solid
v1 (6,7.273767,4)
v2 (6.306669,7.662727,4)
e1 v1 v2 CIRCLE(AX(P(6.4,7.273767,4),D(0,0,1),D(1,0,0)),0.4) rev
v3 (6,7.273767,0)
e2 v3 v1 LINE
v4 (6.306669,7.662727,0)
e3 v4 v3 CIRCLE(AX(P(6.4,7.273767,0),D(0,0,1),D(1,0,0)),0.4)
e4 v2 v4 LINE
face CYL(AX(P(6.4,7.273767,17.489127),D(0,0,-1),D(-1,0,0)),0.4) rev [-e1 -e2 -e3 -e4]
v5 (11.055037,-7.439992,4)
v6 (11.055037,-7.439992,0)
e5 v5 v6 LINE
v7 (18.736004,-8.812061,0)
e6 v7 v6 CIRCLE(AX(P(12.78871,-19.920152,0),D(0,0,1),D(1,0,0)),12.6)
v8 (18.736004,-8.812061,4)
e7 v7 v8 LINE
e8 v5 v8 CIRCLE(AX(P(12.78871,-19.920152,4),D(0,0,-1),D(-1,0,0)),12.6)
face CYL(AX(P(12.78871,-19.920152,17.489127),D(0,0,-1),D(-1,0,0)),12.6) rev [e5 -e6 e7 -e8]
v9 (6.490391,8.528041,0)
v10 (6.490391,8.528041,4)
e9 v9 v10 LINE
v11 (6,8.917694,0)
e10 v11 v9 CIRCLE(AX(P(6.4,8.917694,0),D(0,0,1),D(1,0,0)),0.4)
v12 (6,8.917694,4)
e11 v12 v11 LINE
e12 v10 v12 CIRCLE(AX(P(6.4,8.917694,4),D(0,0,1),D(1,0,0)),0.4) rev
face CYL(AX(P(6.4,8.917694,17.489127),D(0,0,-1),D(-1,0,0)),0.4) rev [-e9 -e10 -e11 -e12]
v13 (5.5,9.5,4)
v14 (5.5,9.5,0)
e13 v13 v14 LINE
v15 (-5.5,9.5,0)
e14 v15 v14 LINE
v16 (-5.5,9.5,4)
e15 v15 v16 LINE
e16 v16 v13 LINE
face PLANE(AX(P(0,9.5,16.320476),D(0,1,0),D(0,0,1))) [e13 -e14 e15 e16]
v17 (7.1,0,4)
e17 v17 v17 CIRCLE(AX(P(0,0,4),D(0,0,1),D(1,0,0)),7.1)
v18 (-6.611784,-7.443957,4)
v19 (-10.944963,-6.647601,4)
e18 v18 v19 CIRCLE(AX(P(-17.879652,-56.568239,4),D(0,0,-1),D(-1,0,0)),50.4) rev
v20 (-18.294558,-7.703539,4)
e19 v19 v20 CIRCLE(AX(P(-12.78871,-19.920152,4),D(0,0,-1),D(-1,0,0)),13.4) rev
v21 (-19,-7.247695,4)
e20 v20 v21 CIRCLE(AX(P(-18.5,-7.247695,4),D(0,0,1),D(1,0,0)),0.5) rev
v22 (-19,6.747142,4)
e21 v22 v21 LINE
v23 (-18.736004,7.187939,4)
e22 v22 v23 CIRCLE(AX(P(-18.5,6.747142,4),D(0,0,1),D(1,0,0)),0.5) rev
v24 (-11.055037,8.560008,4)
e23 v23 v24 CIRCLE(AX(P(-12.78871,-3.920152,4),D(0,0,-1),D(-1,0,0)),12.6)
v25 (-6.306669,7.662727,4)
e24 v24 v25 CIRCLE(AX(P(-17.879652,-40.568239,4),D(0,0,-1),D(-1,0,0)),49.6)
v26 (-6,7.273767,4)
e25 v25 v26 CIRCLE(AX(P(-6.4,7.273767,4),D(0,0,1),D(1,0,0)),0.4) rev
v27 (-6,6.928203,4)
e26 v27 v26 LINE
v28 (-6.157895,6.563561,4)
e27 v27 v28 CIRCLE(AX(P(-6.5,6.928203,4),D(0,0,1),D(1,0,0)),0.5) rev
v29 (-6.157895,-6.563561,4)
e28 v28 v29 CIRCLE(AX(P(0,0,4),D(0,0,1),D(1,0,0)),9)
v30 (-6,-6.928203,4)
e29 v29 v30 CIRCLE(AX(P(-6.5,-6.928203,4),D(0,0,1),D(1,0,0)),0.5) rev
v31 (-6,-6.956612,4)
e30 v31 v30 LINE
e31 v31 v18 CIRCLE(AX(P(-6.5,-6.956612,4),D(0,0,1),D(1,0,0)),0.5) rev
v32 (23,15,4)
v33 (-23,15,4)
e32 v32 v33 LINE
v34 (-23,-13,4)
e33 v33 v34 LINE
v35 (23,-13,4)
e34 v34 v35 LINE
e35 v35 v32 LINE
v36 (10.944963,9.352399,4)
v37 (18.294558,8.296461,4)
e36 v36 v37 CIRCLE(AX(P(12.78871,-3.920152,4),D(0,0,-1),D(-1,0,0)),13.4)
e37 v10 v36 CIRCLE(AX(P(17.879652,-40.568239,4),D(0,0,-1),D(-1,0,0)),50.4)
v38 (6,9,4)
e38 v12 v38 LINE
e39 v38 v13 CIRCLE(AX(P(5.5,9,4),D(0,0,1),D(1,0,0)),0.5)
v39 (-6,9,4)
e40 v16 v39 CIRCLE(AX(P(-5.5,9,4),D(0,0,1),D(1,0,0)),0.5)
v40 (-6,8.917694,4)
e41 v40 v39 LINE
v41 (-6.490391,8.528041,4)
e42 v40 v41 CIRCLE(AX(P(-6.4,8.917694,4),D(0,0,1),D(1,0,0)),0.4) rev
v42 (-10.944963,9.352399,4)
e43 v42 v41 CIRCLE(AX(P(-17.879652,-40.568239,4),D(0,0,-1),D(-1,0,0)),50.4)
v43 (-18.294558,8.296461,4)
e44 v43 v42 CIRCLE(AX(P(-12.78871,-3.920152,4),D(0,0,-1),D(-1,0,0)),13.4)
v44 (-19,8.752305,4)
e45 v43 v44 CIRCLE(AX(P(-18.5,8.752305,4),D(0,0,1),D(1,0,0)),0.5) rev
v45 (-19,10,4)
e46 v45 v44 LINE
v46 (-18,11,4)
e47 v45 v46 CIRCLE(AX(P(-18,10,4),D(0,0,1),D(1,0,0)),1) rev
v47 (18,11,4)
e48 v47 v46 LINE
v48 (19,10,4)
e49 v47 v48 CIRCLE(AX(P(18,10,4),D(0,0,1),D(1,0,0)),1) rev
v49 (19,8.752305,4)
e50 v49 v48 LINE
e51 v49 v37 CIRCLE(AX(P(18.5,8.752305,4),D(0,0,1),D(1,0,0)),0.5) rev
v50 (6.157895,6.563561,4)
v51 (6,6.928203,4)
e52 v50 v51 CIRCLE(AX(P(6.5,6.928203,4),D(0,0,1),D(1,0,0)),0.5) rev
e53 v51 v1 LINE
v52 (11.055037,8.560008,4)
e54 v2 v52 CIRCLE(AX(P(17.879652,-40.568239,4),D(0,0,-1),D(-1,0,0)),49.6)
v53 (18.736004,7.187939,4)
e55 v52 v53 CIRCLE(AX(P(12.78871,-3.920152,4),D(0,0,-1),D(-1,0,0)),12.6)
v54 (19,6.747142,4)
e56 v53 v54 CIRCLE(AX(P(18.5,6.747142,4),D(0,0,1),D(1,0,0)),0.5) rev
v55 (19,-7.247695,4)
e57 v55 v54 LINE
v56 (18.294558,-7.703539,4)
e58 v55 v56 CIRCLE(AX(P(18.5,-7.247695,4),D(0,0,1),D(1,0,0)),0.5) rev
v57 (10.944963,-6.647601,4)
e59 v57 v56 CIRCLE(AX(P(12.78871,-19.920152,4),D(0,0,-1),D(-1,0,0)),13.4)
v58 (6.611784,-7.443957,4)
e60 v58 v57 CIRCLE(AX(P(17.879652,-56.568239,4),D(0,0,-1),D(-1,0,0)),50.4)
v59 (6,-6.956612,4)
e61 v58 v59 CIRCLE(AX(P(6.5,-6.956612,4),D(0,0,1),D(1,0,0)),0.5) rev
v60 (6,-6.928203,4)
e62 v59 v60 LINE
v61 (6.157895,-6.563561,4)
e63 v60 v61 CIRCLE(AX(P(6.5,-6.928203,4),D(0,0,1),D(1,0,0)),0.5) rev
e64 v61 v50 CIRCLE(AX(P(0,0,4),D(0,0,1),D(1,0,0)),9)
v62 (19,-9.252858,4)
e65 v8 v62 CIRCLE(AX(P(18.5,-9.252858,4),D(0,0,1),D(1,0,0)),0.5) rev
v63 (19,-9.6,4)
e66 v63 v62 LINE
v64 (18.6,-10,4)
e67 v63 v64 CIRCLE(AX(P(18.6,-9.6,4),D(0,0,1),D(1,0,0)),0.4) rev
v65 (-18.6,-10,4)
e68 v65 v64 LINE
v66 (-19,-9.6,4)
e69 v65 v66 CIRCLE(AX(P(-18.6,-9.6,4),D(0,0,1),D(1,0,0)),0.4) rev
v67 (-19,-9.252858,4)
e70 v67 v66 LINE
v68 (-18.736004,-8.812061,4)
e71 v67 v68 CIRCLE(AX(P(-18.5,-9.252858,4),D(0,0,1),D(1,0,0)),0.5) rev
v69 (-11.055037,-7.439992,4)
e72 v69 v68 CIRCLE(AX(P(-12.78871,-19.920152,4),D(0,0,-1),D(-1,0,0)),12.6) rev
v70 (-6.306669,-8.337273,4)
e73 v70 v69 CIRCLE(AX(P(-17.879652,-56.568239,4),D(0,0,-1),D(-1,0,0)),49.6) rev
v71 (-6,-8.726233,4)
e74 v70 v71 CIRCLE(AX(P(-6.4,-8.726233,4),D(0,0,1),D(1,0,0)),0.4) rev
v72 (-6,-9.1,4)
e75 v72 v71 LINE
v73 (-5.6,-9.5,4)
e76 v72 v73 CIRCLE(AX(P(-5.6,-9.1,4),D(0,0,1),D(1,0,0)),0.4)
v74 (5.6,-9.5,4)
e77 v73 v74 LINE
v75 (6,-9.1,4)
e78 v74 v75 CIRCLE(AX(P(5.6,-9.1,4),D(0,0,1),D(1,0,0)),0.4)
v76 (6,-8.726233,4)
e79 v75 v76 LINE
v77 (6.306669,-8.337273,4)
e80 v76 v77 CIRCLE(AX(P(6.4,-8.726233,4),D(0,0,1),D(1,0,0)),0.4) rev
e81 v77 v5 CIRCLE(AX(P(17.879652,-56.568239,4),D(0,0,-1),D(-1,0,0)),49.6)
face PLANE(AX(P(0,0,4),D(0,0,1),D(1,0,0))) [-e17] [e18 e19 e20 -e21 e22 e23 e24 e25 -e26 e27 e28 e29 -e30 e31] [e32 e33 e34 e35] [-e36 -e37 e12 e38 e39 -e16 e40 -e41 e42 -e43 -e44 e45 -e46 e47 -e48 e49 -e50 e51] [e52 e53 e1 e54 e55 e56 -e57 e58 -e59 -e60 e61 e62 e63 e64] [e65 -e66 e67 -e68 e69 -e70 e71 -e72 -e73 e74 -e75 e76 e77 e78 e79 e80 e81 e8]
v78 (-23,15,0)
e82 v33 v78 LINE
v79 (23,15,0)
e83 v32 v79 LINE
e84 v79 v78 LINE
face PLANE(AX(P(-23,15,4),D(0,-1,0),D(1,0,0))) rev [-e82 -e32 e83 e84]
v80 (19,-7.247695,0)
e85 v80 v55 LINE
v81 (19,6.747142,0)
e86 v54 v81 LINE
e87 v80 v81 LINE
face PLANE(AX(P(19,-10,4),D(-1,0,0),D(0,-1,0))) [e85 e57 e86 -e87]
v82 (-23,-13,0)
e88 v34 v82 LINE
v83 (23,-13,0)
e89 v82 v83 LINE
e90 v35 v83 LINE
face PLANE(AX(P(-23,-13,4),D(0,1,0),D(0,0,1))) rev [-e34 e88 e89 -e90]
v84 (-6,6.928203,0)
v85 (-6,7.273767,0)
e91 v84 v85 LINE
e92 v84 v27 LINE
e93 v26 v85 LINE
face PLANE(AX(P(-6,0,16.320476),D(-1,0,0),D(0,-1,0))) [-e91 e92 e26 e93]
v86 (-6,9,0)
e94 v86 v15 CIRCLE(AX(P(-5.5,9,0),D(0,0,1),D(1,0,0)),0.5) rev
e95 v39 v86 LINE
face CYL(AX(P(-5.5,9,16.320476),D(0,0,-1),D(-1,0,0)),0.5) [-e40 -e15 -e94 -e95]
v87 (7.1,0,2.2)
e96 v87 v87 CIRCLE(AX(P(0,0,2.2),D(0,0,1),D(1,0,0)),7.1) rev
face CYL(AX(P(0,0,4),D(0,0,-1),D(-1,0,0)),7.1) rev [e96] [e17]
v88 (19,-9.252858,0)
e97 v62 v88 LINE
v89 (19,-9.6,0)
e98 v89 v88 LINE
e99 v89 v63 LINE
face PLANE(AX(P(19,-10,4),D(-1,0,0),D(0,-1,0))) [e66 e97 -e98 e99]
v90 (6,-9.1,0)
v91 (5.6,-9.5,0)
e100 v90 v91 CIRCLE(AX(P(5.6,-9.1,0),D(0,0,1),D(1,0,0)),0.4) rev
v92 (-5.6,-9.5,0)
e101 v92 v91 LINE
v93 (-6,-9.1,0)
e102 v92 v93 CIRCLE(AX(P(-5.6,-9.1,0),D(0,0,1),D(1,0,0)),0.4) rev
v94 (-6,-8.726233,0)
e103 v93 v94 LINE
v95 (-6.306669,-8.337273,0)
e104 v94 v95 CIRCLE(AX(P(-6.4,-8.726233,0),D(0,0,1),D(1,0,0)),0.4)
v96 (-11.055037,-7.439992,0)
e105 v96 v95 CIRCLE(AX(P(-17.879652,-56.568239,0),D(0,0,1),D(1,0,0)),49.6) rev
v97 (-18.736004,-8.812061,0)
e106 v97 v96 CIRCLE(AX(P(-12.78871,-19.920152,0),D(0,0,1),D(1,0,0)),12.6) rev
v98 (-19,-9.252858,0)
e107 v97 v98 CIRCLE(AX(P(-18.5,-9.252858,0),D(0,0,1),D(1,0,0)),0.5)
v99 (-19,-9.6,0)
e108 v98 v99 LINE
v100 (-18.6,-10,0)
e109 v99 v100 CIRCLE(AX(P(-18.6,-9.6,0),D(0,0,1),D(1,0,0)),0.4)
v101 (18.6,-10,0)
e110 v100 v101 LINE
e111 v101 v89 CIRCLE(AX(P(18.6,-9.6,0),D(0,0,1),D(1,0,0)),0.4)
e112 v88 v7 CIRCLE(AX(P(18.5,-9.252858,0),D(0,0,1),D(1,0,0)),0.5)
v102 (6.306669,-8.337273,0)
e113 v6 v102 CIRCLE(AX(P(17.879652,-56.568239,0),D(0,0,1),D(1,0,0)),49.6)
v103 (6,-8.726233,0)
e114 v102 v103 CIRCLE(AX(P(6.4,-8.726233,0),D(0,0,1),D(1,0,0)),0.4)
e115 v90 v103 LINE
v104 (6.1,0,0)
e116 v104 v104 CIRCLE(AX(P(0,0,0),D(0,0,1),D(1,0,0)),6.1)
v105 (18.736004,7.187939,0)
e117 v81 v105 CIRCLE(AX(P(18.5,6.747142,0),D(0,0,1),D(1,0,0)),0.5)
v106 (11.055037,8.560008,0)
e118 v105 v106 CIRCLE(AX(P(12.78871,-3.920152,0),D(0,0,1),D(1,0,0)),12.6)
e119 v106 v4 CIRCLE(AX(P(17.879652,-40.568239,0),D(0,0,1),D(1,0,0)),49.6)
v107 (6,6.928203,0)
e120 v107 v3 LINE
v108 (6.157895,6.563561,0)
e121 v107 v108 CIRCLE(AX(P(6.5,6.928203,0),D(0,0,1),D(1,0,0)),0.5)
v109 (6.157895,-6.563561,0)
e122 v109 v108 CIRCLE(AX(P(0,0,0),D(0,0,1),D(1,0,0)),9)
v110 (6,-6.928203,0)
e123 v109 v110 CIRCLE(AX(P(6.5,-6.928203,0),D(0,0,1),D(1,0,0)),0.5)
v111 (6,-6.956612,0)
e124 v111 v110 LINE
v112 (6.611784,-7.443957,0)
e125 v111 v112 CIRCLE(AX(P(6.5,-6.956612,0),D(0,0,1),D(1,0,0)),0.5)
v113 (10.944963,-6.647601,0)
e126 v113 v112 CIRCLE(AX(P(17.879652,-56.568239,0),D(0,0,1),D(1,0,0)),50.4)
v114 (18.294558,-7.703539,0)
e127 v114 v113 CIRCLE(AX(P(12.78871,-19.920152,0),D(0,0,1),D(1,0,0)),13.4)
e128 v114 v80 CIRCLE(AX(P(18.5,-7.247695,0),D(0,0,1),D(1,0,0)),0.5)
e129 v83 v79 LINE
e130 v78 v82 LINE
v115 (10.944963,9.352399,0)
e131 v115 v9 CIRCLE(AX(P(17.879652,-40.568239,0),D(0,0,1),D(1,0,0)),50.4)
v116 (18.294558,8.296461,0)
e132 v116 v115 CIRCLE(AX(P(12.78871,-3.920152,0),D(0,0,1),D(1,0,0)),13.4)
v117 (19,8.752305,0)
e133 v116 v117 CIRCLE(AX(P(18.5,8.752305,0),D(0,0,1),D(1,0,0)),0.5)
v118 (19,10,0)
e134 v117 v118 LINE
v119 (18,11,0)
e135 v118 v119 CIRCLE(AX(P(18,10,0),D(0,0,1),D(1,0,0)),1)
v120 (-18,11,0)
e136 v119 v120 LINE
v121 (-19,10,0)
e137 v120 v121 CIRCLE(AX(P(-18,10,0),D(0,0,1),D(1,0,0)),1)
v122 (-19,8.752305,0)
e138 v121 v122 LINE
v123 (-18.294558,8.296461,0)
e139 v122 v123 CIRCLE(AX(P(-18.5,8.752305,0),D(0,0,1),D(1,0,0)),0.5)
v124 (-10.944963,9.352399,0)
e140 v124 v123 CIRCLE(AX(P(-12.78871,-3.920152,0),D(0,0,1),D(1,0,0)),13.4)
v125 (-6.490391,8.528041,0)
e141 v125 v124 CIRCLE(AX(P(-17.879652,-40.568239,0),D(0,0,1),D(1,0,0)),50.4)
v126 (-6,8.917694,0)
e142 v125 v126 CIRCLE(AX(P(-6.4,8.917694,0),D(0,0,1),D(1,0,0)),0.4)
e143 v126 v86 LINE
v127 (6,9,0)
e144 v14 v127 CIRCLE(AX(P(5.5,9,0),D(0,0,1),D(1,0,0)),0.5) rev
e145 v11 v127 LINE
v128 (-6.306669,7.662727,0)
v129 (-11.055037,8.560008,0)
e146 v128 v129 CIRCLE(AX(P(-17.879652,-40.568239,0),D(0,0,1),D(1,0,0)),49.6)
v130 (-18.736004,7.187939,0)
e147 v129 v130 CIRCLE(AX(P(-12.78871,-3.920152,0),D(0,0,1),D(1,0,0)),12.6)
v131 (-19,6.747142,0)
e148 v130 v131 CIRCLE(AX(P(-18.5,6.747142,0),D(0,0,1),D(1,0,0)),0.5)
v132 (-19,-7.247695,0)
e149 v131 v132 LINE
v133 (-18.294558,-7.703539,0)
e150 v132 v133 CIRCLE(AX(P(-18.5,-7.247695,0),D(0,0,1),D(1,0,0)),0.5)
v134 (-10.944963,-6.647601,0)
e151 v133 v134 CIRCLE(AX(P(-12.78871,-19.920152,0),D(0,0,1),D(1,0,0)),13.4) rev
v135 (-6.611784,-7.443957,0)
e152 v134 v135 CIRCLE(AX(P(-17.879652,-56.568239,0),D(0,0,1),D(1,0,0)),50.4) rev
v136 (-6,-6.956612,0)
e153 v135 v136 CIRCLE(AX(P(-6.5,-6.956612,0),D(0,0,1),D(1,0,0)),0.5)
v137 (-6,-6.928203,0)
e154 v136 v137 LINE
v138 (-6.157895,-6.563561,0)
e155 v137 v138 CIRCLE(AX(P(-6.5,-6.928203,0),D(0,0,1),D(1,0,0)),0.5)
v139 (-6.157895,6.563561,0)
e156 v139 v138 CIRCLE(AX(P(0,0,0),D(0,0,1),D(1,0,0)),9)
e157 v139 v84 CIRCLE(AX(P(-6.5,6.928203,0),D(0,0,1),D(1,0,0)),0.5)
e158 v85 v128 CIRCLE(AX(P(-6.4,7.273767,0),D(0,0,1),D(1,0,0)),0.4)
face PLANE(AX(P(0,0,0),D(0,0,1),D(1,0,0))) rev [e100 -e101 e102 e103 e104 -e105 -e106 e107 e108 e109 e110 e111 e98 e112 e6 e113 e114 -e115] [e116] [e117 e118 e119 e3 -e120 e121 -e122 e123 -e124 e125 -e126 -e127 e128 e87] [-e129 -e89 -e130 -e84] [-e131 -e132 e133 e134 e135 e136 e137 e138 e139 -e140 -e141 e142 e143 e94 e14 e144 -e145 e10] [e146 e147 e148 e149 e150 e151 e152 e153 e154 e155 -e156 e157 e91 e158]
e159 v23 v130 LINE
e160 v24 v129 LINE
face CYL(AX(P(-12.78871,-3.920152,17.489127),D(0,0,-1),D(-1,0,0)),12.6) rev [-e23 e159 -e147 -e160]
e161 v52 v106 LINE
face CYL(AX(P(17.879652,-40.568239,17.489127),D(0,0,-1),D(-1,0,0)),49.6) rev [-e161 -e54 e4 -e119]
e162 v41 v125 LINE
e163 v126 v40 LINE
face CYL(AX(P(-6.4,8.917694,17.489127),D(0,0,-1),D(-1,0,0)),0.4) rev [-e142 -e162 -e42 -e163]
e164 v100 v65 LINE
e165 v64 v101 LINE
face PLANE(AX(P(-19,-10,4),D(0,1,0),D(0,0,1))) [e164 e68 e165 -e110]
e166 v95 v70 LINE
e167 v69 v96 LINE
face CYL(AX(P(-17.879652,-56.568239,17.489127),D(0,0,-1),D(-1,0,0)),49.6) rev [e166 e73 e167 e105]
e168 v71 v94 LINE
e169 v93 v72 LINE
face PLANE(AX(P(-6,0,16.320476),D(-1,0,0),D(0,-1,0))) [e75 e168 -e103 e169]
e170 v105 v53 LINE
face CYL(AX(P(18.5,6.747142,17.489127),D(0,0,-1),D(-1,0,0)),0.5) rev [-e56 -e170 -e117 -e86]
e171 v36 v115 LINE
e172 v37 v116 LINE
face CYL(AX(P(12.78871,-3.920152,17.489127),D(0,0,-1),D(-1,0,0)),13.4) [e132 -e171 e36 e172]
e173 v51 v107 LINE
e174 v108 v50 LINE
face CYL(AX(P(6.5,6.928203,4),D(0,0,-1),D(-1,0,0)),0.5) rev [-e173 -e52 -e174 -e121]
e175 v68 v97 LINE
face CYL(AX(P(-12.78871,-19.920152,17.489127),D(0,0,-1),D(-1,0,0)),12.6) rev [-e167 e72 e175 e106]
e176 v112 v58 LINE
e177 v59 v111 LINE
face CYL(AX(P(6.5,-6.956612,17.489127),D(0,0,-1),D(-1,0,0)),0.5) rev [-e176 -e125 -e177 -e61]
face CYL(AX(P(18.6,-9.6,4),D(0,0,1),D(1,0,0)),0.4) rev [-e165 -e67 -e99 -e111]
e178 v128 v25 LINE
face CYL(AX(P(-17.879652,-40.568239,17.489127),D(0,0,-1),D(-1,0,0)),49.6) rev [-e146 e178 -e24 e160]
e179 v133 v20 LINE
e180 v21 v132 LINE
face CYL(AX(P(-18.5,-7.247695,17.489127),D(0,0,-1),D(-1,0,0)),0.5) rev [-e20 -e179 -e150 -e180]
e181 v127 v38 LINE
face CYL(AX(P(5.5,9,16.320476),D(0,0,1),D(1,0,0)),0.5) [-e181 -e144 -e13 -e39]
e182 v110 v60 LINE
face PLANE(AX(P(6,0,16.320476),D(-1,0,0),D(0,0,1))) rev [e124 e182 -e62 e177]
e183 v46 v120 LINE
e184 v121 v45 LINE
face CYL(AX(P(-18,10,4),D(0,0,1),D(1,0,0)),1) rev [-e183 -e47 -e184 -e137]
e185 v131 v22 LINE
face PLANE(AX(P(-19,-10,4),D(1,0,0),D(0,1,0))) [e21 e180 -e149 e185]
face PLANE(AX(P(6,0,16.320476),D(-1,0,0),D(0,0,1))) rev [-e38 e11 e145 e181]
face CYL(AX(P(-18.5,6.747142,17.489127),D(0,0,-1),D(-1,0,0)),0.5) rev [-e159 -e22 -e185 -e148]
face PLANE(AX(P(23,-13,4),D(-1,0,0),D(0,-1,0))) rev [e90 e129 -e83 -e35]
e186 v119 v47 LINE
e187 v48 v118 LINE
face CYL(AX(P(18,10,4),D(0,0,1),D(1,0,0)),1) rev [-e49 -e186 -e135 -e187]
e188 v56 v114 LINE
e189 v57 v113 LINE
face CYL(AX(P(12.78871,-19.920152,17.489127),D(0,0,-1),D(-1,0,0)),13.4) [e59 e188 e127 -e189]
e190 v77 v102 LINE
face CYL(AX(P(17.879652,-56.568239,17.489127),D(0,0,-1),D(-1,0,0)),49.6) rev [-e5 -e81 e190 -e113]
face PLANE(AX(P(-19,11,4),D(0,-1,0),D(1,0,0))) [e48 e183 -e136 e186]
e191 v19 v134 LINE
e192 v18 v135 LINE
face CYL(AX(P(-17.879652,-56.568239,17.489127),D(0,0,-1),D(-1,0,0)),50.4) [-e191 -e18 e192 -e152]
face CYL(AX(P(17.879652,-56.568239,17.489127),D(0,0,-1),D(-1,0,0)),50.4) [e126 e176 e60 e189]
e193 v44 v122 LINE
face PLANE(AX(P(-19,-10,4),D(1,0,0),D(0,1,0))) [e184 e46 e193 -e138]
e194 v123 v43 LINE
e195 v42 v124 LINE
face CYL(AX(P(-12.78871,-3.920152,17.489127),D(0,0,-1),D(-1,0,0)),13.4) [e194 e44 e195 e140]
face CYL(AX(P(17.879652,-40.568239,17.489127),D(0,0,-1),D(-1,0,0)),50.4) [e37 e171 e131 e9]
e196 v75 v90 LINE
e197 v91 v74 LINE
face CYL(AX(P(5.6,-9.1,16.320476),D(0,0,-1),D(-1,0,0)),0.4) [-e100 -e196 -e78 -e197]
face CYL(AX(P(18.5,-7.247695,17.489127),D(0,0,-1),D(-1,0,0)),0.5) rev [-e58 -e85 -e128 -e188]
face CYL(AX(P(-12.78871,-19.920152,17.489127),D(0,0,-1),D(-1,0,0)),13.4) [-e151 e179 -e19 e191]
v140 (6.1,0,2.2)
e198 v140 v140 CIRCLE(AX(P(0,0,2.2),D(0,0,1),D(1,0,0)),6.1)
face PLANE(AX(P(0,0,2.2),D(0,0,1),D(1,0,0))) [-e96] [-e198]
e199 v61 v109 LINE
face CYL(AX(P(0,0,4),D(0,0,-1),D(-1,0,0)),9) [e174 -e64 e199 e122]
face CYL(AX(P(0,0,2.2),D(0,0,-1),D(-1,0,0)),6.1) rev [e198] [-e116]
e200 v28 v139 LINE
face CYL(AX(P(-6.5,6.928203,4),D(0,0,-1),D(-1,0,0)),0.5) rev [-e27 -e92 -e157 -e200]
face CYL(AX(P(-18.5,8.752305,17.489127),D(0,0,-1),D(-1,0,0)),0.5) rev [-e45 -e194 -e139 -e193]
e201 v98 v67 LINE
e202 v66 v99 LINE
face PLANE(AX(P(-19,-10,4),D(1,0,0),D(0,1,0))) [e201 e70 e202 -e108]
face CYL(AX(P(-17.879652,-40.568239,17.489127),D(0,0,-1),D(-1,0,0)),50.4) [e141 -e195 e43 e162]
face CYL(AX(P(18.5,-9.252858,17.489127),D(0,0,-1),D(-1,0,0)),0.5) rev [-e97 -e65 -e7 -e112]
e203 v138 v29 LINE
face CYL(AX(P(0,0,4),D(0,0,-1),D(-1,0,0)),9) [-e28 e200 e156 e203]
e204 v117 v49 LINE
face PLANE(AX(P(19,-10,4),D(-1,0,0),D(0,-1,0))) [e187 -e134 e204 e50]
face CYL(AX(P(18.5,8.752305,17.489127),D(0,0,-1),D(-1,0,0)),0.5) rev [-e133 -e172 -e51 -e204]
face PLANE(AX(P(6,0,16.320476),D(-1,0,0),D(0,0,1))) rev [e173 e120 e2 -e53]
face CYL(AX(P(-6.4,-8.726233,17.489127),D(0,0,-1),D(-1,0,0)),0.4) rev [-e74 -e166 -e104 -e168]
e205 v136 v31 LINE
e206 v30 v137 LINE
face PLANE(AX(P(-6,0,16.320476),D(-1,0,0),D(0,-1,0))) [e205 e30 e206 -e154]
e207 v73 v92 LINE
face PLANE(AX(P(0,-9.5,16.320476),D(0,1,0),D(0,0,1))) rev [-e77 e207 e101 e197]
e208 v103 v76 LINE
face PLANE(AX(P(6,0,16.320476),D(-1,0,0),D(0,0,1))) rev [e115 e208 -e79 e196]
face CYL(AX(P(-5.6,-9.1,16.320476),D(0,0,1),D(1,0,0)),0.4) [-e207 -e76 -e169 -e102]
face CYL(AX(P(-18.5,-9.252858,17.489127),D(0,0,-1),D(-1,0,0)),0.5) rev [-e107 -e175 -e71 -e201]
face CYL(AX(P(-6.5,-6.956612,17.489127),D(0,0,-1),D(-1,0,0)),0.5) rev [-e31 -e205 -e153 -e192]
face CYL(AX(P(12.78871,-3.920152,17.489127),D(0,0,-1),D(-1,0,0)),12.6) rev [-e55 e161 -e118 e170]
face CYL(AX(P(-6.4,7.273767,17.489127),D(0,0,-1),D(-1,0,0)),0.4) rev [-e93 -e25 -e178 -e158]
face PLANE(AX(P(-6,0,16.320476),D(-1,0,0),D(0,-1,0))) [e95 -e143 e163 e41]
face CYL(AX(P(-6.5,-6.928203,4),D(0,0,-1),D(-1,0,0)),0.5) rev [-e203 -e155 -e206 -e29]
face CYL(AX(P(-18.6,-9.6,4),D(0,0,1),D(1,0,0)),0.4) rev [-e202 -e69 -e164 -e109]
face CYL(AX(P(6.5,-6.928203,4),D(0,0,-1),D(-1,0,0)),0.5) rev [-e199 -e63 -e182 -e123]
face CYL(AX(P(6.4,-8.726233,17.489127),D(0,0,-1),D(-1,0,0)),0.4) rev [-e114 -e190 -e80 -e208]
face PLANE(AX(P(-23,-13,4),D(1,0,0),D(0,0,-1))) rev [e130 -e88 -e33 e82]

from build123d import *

# Parameters (mm, degrees)
SKETCH_2_R          = 7.1
SKETCH_2_R_2        = 6.1
EXTRUDE_1_DEPTH     = 2.2
SKETCH_2_3_R        = 9
SKETCH_2_3_R_2      = 7.1
EXTRUDE_2_DEPTH     = 4
EXTRUDE_3_DEPTH     = 4
SKETCH_4_W          = 46
SKETCH_4_H          = 28
SKETCH_4_W_2        = 38
SKETCH_4_H_2        = 21
EXTRUDE_4_DEPTH     = 4
EXTRUDE_1_2_DEPTH   = 4
DELETE_FACE_1_DEPTH = 4
FILLET_4_R          = 0.5
FILLET_5_R          = 0.4
FILLET_6_R          = 1


# Read off the part's stored shape, not the designer's step: 删除面1
with BuildPart() as part:
    # 草图2 → Extrude 1 (new body)
    with BuildSketch(Plane.XY):
        Circle(SKETCH_2_R)
        Circle(SKETCH_2_R_2, mode=Mode.SUBTRACT)
    extrude(amount=EXTRUDE_1_DEPTH)

    # 草图2<3> → 凸台-拉伸2 (add)
    with BuildSketch(Plane.XY):
        Circle(SKETCH_2_3_R)
        Circle(SKETCH_2_3_R_2, mode=Mode.SUBTRACT)
    extrude(amount=EXTRUDE_2_DEPTH)

    # 草图3 → 凸台-拉伸3 (add)
    with BuildSketch(Plane.XY):
        with BuildLine():
            Line((6, 6.708203932), (6, 9.5))
            Line((6, 9.5), (-6, 9.5))
            Line((-6, 9.5), (-6, 6.708203932))
            ThreePointArc((-6, 6.708203932), (0, 9), (6, 6.708203932))
        make_face()
        with BuildLine():
            Line((-6, -9.5), (6, -9.5))
            Line((6, -9.5), (6, -6.708203932))
            ThreePointArc((6, -6.708203932), (0, -9), (-6, -6.708203932))
            Line((-6, -6.708203932), (-6, -9.5))
        make_face()
    extrude(amount=EXTRUDE_3_DEPTH)



with BuildPart() as body_2:
    # 草图4 → 凸台-拉伸4 (new body)
    with BuildSketch(Plane.XY):
        with Locations((0, 1)):
            Rectangle(SKETCH_4_W, SKETCH_4_H)
        with Locations((0, 0.5)):
            Rectangle(SKETCH_4_W_2, SKETCH_4_H_2, mode=Mode.SUBTRACT)
    extrude(amount=EXTRUDE_4_DEPTH)


with BuildPart() as part_1:
    add(part.part)

    add(body_2.part)  # Extrude 1 2 merges body 2
    # 草图7 → Extrude 1 2 (add)
    with BuildSketch(Plane.XY):
        with BuildLine():
            ThreePointArc((19.19111663, -8.148610709), (15.188418529, -6.736776188), (10.944962783, -6.647601418))
            ThreePointArc((10.944962783, -6.647601418), (8.412688328, -7.06534444), (5.904962783, -7.611454086))
            Line((5.904962783, -7.611454086), (6.095037217, -8.388545914))
            ThreePointArc((6.095037217, -8.388545914), (8.562957594, -7.851104675), (11.055037217, -7.439992495))
            ThreePointArc((11.055037217, -7.439992495), (15.04515232, -7.523843398), (18.80888337, -8.851389291))
            Line((18.80888337, -8.851389291), (19.19111663, -8.148610709))
        make_face()
        with BuildLine():
            ThreePointArc((-18.80888337, -8.851389291), (-15.04515232, -7.523843398), (-11.055037217, -7.439992495))
            ThreePointArc((-11.055037217, -7.439992495), (-8.562957594, -7.851104675), (-6.095037217, -8.388545914))
            Line((-6.095037217, -8.388545914), (-5.904962783, -7.611454086))
            ThreePointArc((-5.904962783, -7.611454086), (-8.412688328, -7.06534444), (-10.944962783, -6.647601418))
            ThreePointArc((-10.944962783, -6.647601418), (-15.188418529, -6.736776188), (-19.19111663, -8.148610709))
            Line((-19.19111663, -8.148610709), (-18.80888337, -8.851389291))
        make_face()
        with BuildLine():
            ThreePointArc((-18.80888337, 7.148610709), (-15.04515232, 8.476156602), (-11.055037217, 8.560007505))
            ThreePointArc((-11.055037217, 8.560007505), (-8.562957594, 8.148895325), (-6.095037217, 7.611454086))
            Line((-6.095037217, 7.611454086), (-5.904962783, 8.388545914))
            ThreePointArc((-5.904962783, 8.388545914), (-8.412688328, 8.93465556), (-10.944962783, 9.352398582))
            ThreePointArc((-10.944962783, 9.352398582), (-15.188418529, 9.263223812), (-19.19111663, 7.851389291))
            Line((-19.19111663, 7.851389291), (-18.80888337, 7.148610709))
        make_face()
        with BuildLine():
            ThreePointArc((19.19111663, 7.851389291), (15.188418529, 9.263223812), (10.944962783, 9.352398582))
            ThreePointArc((10.944962783, 9.352398582), (8.412688328, 8.93465556), (5.904962783, 8.388545914))
            Line((5.904962783, 8.388545914), (6.095037217, 7.611454086))
            ThreePointArc((6.095037217, 7.611454086), (8.562957594, 8.148895325), (11.055037217, 8.560007505))
            ThreePointArc((11.055037217, 8.560007505), (15.04515232, 8.476156602), (18.80888337, 7.148610709))
            Line((18.80888337, 7.148610709), (19.19111663, 7.851389291))
        make_face()
    extrude(amount=EXTRUDE_1_2_DEPTH)

    # Delete Face 1 outline → Delete Face 1 (add)
    with BuildSketch(Plane.XY):
        with BuildLine():
            ThreePointArc((-19, 7.042506057), (-18.904671788, 7.095972847), (-18.80888337, 7.148610709))
            Line((-18.80888337, 7.148610709), (-19, 7.5))
            Line((-19, 7.5), (-19, 7.042506057))
        make_face()
        with BuildLine():
            Line((-6, 7.588108866), (-6, 8))
            Line((-6, 8), (-6.095037217, 7.611454086))
            ThreePointArc((-6.095037217, 7.611454086), (-6.047512851, 7.599804915), (-6, 7.588108866))
        make_face()
        with BuildLine():
            ThreePointArc((-19, -8.957493943), (-18.904671788, -8.904027153), (-18.80888337, -8.851389291))
            Line((-18.80888337, -8.851389291), (-19, -8.5))
            Line((-19, -8.5), (-19, -8.957493943))
        make_face()
        with BuildLine():
            Line((-6, -8.411891134), (-6, -8))
            Line((-6, -8), (-6.095037217, -8.388545914))
            ThreePointArc((-6.095037217, -8.388545914), (-6.047512851, -8.400195085), (-6, -8.411891134))
        make_face()
        with BuildLine():
            Line((6.095037217, 7.611454086), (6, 8))
            Line((6, 8), (6, 7.588108866))
            ThreePointArc((6, 7.588108866), (6.047512851, 7.599804915), (6.095037217, 7.611454086))
        make_face()
        with BuildLine():
            Line((19, 7.5), (18.80888337, 7.148610709))
            ThreePointArc((18.80888337, 7.148610709), (18.904671788, 7.095972847), (19, 7.042506057))
            Line((19, 7.042506057), (19, 7.5))
        make_face()
        with BuildLine():
            Line((6.095037217, -8.388545914), (6, -8))
            Line((6, -8), (6, -8.411891134))
            ThreePointArc((6, -8.411891134), (6.047512851, -8.400195085), (6.095037217, -8.388545914))
        make_face()
        with BuildLine():
            Line((19, -8.5), (18.80888337, -8.851389291))
            ThreePointArc((18.80888337, -8.851389291), (18.904671788, -8.904027153), (19, -8.957493943))
            Line((19, -8.957493943), (19, -8.5))
        make_face()
    extrude(amount=DELETE_FACE_1_DEPTH)

    # 圆角4
    fillet_4_edges = [part_1.edges().sort_by_distance(p)[0] for p in [
        (19, -8.046657496, 2),
        (6, -7.588305973, 2),
        (-19, -8.046657496, 2),
        (-6, -7.588305973, 2),
        (-6, 9.5, 2),
        (6, 9.5, 2),
        (6, 6.708203932, 2),
        (-6, 6.708203932, 2),
        (19, -8.957493943, 2),
        (-19, -8.957493943, 2),
        (-19, 7.042506057, 2),
        (19, 7.042506057, 2),
        (6, -6.708203932, 2),
        (-6, -6.708203932, 2),
        (-19, 7.953342504, 2),
        (19, 7.953342504, 2),
    ]]
    fillet(fillet_4_edges, radius=FILLET_4_R)

    # 圆角5
    fillet_5_edges = [part_1.edges().sort_by_distance(p)[0] for p in [
        (6, -8.411891134, 2),
        (-6, -8.411891134, 2),
        (-6, 7.588108866, 2),
        (6, 7.588108866, 2),
        (-6, -9.5, 2),
        (6, -9.5, 2),
        (-6, 8.411694027, 2),
        (-19, -10, 2),
        (19, -10, 2),
        (6, 8.411694027, 2),
    ]]
    fillet(fillet_5_edges, radius=FILLET_5_R)

    # 圆角6
    fillet_6_edges = [part_1.edges().sort_by_distance(p)[0] for p in [
        (19, 11, 2),
        (-19, 11, 2),
    ]]
    fillet(fillet_6_edges, radius=FILLET_6_R)


solid = part_1.part
